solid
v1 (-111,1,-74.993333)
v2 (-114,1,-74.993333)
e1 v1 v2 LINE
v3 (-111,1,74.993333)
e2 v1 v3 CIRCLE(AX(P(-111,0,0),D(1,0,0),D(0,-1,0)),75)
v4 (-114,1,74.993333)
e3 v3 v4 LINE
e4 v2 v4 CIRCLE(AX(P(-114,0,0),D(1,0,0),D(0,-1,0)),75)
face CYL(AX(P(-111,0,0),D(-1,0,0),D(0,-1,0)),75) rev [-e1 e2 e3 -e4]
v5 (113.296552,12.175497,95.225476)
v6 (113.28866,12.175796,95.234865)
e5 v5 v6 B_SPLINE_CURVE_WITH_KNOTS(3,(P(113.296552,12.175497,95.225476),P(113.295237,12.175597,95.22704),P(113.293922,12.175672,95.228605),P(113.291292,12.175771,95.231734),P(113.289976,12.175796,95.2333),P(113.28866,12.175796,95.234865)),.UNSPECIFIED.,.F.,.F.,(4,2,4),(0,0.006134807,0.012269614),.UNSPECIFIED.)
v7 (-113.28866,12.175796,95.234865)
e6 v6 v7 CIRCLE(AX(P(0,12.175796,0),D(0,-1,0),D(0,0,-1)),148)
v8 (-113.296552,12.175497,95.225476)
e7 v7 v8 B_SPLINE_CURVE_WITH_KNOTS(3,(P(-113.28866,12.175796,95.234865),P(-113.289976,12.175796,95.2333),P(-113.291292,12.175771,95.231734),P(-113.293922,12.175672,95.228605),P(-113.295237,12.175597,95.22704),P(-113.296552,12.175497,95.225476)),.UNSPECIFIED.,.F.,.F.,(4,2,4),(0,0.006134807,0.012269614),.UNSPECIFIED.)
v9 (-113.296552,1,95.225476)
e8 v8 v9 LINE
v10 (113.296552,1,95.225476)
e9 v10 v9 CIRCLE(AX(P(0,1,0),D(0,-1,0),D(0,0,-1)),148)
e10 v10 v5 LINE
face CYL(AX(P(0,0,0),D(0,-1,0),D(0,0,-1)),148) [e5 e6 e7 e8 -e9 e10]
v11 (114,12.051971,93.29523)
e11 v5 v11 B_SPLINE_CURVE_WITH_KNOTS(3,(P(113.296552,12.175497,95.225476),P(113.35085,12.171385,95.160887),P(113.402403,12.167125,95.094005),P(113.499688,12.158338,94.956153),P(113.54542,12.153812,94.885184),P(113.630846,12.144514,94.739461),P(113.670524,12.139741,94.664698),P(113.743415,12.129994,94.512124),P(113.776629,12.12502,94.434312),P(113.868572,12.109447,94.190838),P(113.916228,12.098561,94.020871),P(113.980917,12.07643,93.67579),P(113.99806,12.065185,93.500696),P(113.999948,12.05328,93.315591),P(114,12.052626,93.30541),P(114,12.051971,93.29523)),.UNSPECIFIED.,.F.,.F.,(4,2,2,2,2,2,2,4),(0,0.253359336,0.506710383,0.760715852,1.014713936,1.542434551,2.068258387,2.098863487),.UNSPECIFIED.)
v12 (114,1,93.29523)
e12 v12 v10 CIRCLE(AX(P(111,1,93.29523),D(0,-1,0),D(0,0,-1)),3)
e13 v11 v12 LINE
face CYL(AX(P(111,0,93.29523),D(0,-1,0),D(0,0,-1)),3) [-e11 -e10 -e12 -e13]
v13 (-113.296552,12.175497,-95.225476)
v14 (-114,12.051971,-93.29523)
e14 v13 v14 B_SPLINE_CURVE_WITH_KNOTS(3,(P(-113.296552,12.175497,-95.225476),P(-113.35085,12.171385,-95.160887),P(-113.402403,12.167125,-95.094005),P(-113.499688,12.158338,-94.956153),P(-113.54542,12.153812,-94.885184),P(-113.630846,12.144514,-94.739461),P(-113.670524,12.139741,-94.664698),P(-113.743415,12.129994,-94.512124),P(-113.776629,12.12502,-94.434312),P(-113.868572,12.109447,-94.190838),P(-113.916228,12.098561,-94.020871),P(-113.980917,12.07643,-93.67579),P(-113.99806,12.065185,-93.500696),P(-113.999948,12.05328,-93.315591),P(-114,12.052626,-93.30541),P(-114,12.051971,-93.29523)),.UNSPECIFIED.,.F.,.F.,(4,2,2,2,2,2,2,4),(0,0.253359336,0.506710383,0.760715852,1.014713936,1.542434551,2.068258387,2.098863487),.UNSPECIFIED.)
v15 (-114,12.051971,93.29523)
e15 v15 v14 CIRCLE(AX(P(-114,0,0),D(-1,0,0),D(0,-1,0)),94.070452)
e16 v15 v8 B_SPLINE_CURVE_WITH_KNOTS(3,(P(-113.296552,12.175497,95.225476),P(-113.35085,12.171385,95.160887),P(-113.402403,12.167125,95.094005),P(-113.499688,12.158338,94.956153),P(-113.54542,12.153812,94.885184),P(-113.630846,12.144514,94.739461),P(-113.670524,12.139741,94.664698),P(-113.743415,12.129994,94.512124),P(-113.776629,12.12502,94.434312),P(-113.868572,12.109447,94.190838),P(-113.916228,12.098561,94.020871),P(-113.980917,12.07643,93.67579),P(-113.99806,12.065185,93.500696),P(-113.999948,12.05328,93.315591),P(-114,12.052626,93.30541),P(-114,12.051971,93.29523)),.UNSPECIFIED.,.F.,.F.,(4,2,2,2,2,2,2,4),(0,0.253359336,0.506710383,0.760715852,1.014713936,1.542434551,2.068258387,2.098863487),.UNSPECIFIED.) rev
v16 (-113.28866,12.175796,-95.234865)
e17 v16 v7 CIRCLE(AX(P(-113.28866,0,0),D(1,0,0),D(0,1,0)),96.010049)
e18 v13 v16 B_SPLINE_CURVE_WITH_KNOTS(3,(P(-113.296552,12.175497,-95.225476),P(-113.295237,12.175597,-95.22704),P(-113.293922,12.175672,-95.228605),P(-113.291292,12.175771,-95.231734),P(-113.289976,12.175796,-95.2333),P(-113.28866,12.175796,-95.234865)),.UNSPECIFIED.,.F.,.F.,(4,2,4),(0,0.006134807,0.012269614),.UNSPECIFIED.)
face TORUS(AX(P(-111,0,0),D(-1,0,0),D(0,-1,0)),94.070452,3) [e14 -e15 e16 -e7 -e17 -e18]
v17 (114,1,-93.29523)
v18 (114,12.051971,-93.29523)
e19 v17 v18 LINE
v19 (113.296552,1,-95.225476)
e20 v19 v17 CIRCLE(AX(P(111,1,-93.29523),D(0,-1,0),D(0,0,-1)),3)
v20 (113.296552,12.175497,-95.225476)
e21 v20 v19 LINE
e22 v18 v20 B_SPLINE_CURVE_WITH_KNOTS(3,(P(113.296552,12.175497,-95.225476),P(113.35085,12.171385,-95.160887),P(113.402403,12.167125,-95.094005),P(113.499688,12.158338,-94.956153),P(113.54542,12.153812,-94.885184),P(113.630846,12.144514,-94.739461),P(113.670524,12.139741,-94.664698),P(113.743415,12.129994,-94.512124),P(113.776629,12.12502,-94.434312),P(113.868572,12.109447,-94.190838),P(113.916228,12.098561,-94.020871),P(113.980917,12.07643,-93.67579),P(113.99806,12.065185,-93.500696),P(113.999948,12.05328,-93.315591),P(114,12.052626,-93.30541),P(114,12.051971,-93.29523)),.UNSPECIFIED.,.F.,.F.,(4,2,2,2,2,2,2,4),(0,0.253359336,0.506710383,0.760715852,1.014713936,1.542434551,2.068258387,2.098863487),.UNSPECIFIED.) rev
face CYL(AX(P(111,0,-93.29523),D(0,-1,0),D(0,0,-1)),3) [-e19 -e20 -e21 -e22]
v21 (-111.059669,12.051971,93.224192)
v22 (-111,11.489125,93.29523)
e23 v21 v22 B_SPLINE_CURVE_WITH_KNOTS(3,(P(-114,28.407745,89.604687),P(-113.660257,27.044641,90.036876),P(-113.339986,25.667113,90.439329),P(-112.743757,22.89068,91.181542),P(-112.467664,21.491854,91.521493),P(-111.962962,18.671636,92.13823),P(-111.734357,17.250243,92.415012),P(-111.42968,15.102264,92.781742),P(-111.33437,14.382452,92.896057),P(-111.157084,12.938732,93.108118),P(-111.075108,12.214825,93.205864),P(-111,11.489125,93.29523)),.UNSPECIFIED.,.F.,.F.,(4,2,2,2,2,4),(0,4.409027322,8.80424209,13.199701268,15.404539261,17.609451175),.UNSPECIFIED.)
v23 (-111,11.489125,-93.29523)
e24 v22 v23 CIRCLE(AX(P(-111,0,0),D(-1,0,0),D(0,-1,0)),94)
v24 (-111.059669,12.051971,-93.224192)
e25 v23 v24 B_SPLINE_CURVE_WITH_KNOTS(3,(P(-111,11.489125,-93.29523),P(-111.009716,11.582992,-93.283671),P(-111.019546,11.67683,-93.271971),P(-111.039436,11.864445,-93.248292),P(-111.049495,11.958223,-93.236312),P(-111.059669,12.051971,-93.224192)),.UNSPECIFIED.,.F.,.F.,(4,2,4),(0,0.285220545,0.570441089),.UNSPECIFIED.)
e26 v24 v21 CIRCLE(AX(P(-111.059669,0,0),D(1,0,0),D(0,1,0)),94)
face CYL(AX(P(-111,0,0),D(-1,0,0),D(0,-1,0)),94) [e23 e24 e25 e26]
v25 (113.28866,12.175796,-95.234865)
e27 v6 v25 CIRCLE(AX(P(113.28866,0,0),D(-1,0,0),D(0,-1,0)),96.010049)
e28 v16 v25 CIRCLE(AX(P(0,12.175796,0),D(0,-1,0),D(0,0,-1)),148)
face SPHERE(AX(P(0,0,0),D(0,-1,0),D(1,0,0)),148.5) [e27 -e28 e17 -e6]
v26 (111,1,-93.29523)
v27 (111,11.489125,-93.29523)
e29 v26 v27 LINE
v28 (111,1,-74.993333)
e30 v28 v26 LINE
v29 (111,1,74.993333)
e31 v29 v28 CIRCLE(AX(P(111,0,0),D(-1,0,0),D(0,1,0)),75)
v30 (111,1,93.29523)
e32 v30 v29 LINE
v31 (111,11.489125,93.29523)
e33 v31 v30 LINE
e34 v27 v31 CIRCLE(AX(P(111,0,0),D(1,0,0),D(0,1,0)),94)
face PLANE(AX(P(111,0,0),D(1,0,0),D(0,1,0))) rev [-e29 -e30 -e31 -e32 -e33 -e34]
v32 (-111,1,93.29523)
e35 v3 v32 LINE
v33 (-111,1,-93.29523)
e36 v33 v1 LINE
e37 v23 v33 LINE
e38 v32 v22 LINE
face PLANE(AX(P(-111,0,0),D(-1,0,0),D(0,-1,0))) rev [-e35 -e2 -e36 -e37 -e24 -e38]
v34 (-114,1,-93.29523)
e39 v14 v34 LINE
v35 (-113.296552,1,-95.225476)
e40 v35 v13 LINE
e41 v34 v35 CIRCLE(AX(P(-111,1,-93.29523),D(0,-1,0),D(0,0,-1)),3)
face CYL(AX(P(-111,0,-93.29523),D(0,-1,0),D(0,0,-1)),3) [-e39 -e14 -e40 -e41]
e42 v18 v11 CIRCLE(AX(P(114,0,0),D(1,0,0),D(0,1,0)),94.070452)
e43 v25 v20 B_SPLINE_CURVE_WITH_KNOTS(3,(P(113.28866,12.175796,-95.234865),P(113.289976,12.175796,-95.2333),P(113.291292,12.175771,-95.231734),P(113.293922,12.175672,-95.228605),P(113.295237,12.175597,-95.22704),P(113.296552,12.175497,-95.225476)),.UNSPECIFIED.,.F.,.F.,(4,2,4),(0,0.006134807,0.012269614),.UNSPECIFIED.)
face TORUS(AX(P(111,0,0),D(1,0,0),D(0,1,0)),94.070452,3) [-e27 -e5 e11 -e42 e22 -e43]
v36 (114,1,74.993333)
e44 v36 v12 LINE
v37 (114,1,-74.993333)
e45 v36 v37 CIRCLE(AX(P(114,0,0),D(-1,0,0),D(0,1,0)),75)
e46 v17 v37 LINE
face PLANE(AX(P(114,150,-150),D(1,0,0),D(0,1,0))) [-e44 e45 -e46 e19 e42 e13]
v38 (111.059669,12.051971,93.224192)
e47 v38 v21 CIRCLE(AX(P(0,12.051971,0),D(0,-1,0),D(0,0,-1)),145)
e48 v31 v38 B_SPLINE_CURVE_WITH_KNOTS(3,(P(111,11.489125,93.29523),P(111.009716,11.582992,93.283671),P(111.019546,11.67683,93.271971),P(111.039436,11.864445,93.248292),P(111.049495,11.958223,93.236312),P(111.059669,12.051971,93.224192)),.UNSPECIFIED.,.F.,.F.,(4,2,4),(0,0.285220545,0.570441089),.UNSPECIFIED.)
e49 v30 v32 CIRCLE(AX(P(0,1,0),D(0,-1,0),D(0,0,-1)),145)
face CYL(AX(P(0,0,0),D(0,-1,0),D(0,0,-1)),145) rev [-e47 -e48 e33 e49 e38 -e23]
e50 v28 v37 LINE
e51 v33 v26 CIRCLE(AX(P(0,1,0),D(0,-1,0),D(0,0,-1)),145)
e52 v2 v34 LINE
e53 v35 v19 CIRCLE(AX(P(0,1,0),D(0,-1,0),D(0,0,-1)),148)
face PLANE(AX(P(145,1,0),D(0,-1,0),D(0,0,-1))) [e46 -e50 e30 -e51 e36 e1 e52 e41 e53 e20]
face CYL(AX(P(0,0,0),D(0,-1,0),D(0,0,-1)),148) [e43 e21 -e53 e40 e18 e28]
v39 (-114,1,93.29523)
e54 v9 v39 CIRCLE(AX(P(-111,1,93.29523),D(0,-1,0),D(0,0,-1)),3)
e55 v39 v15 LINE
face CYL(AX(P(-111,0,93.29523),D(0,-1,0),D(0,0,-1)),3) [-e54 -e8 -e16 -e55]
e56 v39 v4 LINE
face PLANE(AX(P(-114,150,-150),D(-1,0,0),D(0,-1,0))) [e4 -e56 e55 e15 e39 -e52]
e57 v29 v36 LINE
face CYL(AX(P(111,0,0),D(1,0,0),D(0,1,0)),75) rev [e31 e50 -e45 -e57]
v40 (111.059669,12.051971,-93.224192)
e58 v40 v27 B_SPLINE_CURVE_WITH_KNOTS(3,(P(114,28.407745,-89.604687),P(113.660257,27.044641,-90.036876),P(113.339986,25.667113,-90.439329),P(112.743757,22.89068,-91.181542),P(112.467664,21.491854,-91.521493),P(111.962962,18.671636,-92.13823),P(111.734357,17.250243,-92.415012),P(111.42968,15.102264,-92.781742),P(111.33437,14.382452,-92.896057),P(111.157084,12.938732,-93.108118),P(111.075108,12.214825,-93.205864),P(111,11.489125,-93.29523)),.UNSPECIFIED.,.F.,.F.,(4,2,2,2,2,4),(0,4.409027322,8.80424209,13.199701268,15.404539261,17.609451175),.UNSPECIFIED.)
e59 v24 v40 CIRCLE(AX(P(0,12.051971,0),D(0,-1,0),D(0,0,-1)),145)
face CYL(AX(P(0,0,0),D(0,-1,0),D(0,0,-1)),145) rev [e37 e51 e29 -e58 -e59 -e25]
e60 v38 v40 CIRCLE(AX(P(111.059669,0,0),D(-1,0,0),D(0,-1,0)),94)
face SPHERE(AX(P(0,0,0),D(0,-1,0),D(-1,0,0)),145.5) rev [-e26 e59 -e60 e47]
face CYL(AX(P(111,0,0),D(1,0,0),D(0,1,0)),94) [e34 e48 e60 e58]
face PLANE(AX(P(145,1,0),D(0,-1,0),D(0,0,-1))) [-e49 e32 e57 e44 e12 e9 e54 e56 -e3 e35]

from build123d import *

# Parameters (mm, degrees)
ESQUISSE2_OUTSIDE_W     = 386.766
ESQUISSE2_OUTSIDE_H     = 238.266
ESQUISSE2_OUTSIDE_W_2   = 228
ESQUISSE2_OUTSIDE_H_2   = 155
ENL_V_MAT_EXTRU_1_DEPTH = 150
BOSS_EXTRU_1_DEPTH      = 3
BOSS_EXTRU_2_START      = -3
BOSS_EXTRU_2_DEPTH      = 3
CONG_1_R                = 3


with BuildPart() as part:
    # Esquisse1 → Révolution4 (revolve)
    with BuildSketch(Plane.XY, mode=Mode.PRIVATE) as r_volution4_sk:
        with BuildLine():
            Line((148, 12.175795662), (148, 1))
            Line((148, 1), (145, 1))
            Line((145, 1), (145, 12.051970793))
            ThreePointArc((145, 12.051970793), (98.530929788, 107.060290842), (0, 145.5))
            Line((0, 145.5), (0, 148.5))
            ThreePointArc((0, 148.5), (100.608509442, 109.225353412), (148, 12.175795662))
        make_face()
    revolve(r_volution4_sk.sketch.rotate(Axis((0, 0, 0), (0, 1, 0)), 90), axis=Axis((0, 0, 0), (0, 1, 0)))

    # Esquisse2 outside → Enlèv. mat.-Extru.1 (cut, symmetric)
    with BuildSketch(Plane.XY):
        with Locations((0, 74.75)):
            Rectangle(ESQUISSE2_OUTSIDE_W, ESQUISSE2_OUTSIDE_H)
        with Locations((0, 72.5)):
            Rectangle(ESQUISSE2_OUTSIDE_W_2, ESQUISSE2_OUTSIDE_H_2, mode=Mode.SUBTRACT)
    extrude(amount=ENL_V_MAT_EXTRU_1_DEPTH, both=True, mode=Mode.SUBTRACT)

    # Esquisse3 → Boss.-Extru.1 (add)
    with BuildSketch(Plane(origin=(114, 0, 0), x_dir=(0, 0, -1), z_dir=(1, 0, 0))):
        with BuildLine():
            Line((-93.994680701, 1), (-74.993333037, 1))
            ThreePointArc((-74.993333037, 1), (0, 75), (74.993333037, 1))
            Line((74.993333037, 1), (93.994680701, 1))
            ThreePointArc((93.994680701, 1), (0, 94), (-93.994680701, 1))
        make_face()
    extrude(amount=-BOSS_EXTRU_1_DEPTH)

    # Esquisse4 → Boss.-Extru.2 (add)
    with BuildSketch(Plane.ZY.offset(114).offset(BOSS_EXTRU_2_START)):
        with BuildLine():
            Line((-93.994680701, 1), (-74.993333037, 1))
            ThreePointArc((-74.993333037, 1), (0, 75), (74.993333037, 1))
            Line((74.993333037, 1), (93.994680701, 1))
            ThreePointArc((93.994680701, 1), (0, 94), (-93.994680701, 1))
        make_face()
    extrude(amount=BOSS_EXTRU_2_DEPTH)

    # Congé1
    # the kernel refuses this fillet: 3 mm, written as the material it takes off along each edge
    with BuildSketch(Plane(origin=(-114, 20.411983352, -94.382201712), x_dir=(0.6405708887604551, 0, -0.767899040546764), z_dir=(0, -1, 0)), Plane(origin=(114, 20.411983352, 94.382201712), x_dir=(-0.6405708887604538, 0, 0.7678990405467649), z_dir=(0, -1, 0))) as cong_1_piece_1:
        with BuildLine():
            CenterArc((1.087028375, 2.999979354), CONG_1_R, 230.165597581, 40.046969931)
            Line((-0.834684291, 0.696282232), (0, 0))
            ThreePointArc((0, 0), (0.549079179, -0.001018544), (1.098158359, 0))
        make_face()
    extrude(amount=22.157379249, mode=Mode.SUBTRACT)
    with BuildSketch(Plane(origin=(-114, 0, 0), x_dir=(0, 0.09906318090270165, -0.9950811455300712), z_dir=(0, -0.9950811455300712, -0.09906318090270165))) as cong_1_piece_2:
        with BuildLine():
            CenterArc((94.070452322, 3), CONG_1_R, 270, 40.28066089)
            ThreePointArc((96.010049277, 0.711340206), (95.587852119, 0.354883399), (95.164331553, 0))
            Line((95.164331553, 0), (94.070452322, 0))
        make_face()
    revolve(axis=Axis((-114, 0, 0), (1, 0, 0)), revolution_arc=168.629546335, mode=Mode.SUBTRACT)
    with BuildSketch(Plane(origin=(-114, 20.411983352, 94.382201712), x_dir=(0, 0, -1), z_dir=(0, -1, 0))) as cong_1_piece_3:
        with BuildLine():
            CenterArc((1.086971394, 3), CONG_1_R, 229.953030069, 40.046969931)
            ThreePointArc((-0.84327475, 0.703448276), (-0.422289825, 0.350941999), (0, 0))
            Line((0, 0), (1.086971394, 0))
        make_face()
    extrude(amount=22.157379249, mode=Mode.SUBTRACT)
    with BuildSketch(Plane(origin=(114, 0, 0), x_dir=(0, 0.09906318090270108, 0.9950811455300712), z_dir=(0, -0.9950811455300712, 0.09906318090270108))) as cong_1_piece_4:
        with BuildLine():
            CenterArc((94.070452322, 3), CONG_1_R, 270, 40.28066089)
            Line((94.070452322, 0), (95.164331553, 0))
            ThreePointArc((95.164331553, 0), (95.587852119, 0.354883399), (96.010049277, 0.711340206))
        make_face()
    revolve(axis=Axis((114, 0, 0), (-1, 0, 0)), revolution_arc=168.629546335, mode=Mode.SUBTRACT)
    with BuildSketch(Plane(origin=(114, 20.411983352, -94.382201712), x_dir=(-0.6405708887604424, 0, -0.7678990405467746), z_dir=(0, -1, 0))) as cong_1_piece_5:
        with BuildLine():
            CenterArc((1.087028375, -2.999979354), CONG_1_R, 89.787432488, 40.046969931)
            Line((-0.834684291, -0.696282232), (0, 0))
            ThreePointArc((0, 0), (0.549079179, 0.001018544), (1.098158359, 0))
        make_face()
    extrude(amount=22.157379249, mode=Mode.SUBTRACT)


solid = part.part
